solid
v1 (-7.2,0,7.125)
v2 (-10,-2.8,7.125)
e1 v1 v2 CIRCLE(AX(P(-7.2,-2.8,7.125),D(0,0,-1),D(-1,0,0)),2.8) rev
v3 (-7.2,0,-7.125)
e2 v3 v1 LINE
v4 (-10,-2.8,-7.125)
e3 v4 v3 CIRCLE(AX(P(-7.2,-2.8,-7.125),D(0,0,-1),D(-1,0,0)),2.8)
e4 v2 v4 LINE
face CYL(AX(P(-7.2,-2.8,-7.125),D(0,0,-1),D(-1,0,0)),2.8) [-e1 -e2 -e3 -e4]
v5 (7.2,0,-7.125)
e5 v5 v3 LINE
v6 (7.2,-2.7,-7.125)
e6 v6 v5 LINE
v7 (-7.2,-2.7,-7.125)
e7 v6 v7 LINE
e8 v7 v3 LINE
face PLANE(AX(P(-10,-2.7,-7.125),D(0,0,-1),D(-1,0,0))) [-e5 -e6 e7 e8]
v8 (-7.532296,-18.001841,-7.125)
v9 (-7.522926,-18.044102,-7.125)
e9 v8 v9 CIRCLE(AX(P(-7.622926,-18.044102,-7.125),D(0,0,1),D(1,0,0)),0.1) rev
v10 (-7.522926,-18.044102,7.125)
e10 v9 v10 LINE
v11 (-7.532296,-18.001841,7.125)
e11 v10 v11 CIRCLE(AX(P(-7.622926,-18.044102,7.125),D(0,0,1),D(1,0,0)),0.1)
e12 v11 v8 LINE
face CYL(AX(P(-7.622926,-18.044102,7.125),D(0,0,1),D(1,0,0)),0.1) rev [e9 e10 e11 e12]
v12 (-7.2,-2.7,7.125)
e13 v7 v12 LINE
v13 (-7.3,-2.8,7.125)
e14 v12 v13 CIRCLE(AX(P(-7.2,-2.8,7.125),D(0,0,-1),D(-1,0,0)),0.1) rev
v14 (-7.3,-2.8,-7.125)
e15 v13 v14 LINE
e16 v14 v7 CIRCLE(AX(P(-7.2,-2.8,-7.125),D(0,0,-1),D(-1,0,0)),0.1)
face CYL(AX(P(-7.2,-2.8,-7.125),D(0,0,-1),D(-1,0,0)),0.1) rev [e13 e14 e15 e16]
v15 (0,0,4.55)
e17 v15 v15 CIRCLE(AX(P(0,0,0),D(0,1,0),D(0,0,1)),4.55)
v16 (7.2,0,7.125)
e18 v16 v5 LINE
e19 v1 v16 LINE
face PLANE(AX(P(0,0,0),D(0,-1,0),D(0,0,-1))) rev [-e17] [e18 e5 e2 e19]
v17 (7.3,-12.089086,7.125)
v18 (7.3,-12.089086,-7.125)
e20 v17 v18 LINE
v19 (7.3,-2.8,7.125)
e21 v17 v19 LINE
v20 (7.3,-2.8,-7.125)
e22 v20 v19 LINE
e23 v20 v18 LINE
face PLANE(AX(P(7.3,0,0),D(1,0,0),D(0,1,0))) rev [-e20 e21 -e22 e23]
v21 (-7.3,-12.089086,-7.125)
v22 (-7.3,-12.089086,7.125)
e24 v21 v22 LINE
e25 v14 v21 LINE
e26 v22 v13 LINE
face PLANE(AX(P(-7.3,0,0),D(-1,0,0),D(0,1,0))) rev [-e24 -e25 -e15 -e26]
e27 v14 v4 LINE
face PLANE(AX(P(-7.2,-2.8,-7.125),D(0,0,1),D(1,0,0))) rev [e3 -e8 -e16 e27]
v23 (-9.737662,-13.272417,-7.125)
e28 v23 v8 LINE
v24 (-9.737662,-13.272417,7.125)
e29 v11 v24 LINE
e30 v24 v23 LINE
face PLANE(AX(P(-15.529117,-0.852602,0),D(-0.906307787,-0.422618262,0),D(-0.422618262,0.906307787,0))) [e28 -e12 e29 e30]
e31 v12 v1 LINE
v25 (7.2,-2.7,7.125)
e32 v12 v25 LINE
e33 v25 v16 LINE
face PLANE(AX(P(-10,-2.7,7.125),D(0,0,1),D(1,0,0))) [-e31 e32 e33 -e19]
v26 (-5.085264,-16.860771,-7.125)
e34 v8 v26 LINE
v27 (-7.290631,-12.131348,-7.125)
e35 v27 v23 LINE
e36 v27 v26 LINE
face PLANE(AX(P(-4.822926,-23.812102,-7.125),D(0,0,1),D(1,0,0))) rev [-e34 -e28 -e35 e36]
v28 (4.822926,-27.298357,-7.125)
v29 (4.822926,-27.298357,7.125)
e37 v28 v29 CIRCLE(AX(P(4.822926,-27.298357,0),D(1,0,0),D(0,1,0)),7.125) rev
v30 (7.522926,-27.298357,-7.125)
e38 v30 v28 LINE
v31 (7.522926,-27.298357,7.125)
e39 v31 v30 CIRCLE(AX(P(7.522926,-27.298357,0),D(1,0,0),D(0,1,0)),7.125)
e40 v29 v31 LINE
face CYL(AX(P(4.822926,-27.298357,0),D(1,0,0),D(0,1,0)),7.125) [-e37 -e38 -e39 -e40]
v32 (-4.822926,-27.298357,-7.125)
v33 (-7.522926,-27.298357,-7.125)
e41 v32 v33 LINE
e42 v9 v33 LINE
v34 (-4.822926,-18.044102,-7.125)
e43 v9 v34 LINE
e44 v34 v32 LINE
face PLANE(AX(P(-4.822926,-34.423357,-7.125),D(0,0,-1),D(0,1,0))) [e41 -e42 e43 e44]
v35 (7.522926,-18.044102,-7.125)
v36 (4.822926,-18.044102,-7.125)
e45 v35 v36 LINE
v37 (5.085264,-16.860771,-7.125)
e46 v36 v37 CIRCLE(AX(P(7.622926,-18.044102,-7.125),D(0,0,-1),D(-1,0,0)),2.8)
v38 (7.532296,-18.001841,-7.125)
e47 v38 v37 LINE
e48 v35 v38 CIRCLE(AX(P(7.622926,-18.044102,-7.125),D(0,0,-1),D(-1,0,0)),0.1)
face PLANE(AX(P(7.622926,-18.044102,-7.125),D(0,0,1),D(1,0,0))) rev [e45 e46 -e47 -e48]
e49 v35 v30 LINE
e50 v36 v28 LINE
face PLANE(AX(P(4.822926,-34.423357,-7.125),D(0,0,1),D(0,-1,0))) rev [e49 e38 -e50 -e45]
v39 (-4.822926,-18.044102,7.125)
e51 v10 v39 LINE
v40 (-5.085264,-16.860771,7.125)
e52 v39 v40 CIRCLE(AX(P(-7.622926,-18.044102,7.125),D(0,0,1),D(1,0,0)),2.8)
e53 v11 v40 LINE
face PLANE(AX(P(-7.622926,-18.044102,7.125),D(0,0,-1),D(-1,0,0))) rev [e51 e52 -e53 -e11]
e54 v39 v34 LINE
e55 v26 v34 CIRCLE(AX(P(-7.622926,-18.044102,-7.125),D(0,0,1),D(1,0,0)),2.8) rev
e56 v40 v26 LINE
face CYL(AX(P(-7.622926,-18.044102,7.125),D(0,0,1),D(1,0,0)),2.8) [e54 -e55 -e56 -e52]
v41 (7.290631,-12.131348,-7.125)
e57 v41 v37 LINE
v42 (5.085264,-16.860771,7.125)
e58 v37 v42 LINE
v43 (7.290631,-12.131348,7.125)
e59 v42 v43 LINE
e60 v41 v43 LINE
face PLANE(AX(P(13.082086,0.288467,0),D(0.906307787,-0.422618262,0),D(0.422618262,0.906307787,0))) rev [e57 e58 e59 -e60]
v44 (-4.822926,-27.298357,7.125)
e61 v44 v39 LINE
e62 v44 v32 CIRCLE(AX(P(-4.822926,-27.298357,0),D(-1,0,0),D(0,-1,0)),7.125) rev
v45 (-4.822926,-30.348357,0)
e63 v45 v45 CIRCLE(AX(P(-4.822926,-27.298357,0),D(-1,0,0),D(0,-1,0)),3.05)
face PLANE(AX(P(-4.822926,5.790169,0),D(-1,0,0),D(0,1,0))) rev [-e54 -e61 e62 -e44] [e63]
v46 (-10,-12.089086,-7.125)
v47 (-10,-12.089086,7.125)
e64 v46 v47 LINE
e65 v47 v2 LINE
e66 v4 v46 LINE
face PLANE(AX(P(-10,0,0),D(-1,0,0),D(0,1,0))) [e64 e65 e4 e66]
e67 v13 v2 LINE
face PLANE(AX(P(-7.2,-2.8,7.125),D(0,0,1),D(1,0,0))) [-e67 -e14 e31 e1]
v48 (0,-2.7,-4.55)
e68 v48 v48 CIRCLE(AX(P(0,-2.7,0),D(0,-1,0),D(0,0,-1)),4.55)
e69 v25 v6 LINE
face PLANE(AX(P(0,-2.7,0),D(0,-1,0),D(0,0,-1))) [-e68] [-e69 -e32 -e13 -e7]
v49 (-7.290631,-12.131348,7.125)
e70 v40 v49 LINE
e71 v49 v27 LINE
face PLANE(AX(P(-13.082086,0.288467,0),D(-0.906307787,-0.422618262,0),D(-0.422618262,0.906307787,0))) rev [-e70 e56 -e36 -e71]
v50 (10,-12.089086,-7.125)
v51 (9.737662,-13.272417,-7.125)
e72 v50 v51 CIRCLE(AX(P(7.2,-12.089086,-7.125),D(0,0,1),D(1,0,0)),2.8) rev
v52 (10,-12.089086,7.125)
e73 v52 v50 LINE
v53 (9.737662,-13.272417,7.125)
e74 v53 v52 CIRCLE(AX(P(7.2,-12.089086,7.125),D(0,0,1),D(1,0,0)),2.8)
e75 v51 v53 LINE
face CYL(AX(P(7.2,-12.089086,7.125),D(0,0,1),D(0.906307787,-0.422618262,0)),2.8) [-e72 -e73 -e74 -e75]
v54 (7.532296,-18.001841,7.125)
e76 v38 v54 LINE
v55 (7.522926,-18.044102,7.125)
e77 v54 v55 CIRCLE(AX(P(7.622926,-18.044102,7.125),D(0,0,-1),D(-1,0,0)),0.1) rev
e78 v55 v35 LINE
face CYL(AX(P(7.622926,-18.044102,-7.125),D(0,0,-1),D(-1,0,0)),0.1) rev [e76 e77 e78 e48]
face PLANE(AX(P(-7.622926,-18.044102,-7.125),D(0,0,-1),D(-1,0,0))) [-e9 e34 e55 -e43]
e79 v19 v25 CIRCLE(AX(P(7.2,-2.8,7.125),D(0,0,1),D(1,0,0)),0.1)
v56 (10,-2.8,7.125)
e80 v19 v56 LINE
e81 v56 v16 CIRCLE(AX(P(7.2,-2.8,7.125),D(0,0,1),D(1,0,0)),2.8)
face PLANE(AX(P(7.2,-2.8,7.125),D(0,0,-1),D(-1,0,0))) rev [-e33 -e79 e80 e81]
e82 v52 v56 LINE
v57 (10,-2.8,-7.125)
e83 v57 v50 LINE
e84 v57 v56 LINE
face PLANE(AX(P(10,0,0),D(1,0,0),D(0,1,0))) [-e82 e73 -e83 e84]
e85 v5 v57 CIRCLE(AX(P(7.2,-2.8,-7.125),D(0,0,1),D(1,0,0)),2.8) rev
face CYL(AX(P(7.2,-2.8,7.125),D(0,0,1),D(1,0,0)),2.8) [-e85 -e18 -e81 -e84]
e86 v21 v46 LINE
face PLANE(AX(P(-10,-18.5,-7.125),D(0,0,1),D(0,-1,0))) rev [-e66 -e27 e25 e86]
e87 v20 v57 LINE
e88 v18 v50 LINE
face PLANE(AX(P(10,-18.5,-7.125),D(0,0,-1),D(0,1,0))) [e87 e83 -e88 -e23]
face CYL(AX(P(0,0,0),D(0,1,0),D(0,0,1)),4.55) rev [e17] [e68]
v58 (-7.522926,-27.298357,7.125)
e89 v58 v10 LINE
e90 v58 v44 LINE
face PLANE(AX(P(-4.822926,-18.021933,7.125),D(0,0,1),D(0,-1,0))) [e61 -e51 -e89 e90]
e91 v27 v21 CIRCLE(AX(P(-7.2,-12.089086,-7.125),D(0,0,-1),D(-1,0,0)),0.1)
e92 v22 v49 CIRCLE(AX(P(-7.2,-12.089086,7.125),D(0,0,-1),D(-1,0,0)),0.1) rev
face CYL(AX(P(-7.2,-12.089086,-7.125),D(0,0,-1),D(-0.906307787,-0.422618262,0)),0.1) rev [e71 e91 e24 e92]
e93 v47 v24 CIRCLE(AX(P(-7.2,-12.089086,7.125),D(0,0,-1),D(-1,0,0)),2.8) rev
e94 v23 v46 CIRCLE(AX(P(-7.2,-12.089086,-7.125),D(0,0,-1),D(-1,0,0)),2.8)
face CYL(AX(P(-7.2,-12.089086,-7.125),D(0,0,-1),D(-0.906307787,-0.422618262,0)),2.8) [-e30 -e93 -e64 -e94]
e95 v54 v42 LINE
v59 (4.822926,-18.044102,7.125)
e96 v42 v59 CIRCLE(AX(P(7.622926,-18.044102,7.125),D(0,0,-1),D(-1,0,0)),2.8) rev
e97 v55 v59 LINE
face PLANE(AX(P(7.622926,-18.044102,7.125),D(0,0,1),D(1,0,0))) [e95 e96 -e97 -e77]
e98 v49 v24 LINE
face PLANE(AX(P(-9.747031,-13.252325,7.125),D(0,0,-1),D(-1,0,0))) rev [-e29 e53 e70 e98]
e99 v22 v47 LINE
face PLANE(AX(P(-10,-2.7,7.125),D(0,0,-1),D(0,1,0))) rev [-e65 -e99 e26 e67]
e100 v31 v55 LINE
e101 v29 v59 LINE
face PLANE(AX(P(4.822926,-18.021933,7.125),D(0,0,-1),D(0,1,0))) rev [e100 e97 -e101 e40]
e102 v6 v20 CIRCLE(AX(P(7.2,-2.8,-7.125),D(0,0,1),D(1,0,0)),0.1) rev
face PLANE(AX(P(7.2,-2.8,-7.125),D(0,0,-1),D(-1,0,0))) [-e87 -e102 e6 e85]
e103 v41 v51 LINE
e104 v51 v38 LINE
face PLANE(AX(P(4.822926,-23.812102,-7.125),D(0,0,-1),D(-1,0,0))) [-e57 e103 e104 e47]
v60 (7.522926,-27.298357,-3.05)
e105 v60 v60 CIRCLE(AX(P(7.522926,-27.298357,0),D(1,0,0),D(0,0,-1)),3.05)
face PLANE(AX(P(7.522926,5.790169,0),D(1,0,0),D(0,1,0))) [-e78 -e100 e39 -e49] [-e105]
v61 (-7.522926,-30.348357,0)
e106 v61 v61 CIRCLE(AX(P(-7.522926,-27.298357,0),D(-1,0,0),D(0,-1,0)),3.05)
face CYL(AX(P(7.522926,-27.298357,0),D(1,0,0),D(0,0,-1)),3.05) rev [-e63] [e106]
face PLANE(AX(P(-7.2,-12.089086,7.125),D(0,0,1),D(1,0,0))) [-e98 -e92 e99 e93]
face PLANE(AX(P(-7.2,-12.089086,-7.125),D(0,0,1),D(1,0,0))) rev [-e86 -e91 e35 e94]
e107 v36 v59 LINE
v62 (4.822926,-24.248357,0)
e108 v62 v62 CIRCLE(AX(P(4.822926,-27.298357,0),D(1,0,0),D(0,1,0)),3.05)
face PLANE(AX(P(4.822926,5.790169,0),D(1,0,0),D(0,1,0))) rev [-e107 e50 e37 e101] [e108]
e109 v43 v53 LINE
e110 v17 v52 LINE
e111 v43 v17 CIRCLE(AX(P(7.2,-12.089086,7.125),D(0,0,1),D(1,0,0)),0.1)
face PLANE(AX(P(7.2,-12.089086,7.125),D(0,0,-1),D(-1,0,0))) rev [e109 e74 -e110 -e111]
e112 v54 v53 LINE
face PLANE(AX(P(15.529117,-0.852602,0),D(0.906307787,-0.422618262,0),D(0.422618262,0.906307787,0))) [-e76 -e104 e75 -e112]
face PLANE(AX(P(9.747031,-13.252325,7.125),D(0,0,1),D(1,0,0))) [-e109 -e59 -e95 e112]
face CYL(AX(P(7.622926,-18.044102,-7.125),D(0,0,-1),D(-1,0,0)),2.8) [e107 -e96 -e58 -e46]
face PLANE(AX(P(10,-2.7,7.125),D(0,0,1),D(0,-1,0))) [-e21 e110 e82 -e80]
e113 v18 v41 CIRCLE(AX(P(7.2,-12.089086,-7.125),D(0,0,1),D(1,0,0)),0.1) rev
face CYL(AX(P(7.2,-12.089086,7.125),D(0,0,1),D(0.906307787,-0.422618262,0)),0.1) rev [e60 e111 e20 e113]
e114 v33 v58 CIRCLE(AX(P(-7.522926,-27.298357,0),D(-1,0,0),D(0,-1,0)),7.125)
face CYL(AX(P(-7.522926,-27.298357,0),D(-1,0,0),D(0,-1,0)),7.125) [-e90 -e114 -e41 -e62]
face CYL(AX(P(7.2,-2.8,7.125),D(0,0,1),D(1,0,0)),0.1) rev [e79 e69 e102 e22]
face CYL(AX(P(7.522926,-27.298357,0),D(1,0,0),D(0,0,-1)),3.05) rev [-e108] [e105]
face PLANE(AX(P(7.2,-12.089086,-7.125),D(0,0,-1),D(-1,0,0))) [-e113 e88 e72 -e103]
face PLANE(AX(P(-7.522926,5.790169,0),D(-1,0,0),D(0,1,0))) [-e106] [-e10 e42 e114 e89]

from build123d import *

# Parameters (mm, degrees)
ESBO_O1_W                      = 20
ESBO_O1_H                      = 14.25
FLANGE_BASE2_DEPTH             = 2.7
ARESTA_FLANGE1_STRIP_W         = 11
ARESTA_FLANGE1_STRIP_H         = 2.7
ARESTA_FLANGE1_STRIP_CUT_DEPTH = 14.25
ARESTA_FLANGE1_DEPTH           = 14.25
ARESTA_FLANGE4_START           = -7.125
ARESTA_FLANGE4_DEPTH           = 14.25
ARESTA_FLANGE4_2_DEPTH         = 14.25
ARESTA_FLANGE5_START           = -7.125
ARESTA_FLANGE5_DEPTH           = 14.25
ARESTA_FLANGE5_2_DEPTH         = 14.25
FILETE1_RADIUS                 = 7.125
FILETE1_LENGTH                 = 2.7
FILETE1_OF_ESPELHAR1_2_RADIUS  = 7.125
FILETE1_OF_ESPELHAR1_2_LENGTH  = 2.7
FURO_DE_DI_METRO_6_1_6_1_1_D   = 6.1
FURO_DE_DI_METRO_9_1_9_1_2_D   = 9.1


# Read off the part's stored shape, not the designer's step: Aresta-Flange4, Aresta-Flange5
# Sheet-metal steps are written as plain solids
with BuildPart() as part:
    # Esboço1 → Flange-base2 (new body)
    with BuildSketch(Plane(origin=(0, 0, 0), x_dir=(1, 0, 0), z_dir=(0, 1, 0))):
        Rectangle(ESBO_O1_W, ESBO_O1_H)
    extrude(amount=-FLANGE_BASE2_DEPTH)

    # Aresta-Flange1 strip (across the edge) → Aresta-Flange1 strip cut (cut)
    with BuildSketch(Plane(origin=(10, -2.7, -7.125), x_dir=(-1, 0, 0), z_dir=(0, 0, 1))):
        with Locations((-2.7, -1.35)):
            Rectangle(ARESTA_FLANGE1_STRIP_W, ARESTA_FLANGE1_STRIP_H)
    aresta_flange1_strip_cut = extrude(amount=ARESTA_FLANGE1_STRIP_CUT_DEPTH, mode=Mode.SUBTRACT)

    # Aresta-Flange1 section (across the edge) → Aresta-Flange1 (add)
    with BuildSketch(Plane(origin=(10, -2.7, -7.125), x_dir=(-1, 0, 0), z_dir=(0, 0, 1))):
        with BuildLine():
            Line((0, 0.1), (0, 15.8))
            Line((0, 15.8), (2.7, 15.8))
            Line((2.7, 15.8), (2.7, 0.1))
            ThreePointArc((2.7, 0.1), (2.729289322, 0.029289322), (2.8, 0))
            Line((2.8, 0), (2.8, -2.7))
            ThreePointArc((2.8, -2.7), (0.820101013, -1.879898987), (0, 0.1))
        make_face()
    aresta_flange1 = extrude(amount=ARESTA_FLANGE1_DEPTH)

    # Aresta-Flange4 outline → Aresta-Flange4 (cut)
    with BuildSketch(Plane.XY.offset(ARESTA_FLANGE4_START)):
        with BuildLine():
            ThreePointArc((10, -12.089086259), (9.93362882, -12.695117178), (9.737661804, -13.272417392))
            Line((9.737661804, -13.272417392), (7.3, -18.5))
            Line((7.3, -18.5), (10, -18.5))
            Line((10, -18.5), (10, -12.089086259))
        make_face()
    aresta_flange4 = extrude(amount=ARESTA_FLANGE4_DEPTH, mode=Mode.SUBTRACT)

    # Aresta-Flange4 2 outline → Aresta-Flange4 2 (add)
    with BuildSketch(Plane.XY.offset(ARESTA_FLANGE4_START)):
        with BuildLine():
            Line((4.822926294, -23.812101706), (7.3, -18.5))
            Line((7.3, -18.5), (7.3, -12.089086259))
            ThreePointArc((7.3, -12.089086259), (7.297629601, -12.11073022), (7.290630779, -12.131348085))
            Line((7.290630779, -12.131348085), (2.375895269, -22.671032399))
            Line((2.375895269, -22.671032399), (4.822926294, -23.812101706))
        make_face()
    aresta_flange4_2 = extrude(amount=ARESTA_FLANGE4_2_DEPTH)

    # Aresta-Flange5 outline → Aresta-Flange5 (cut)
    with BuildSketch(Plane.XY.offset(ARESTA_FLANGE5_START)):
        with BuildLine():
            Line((4.822926294, -23.812101706), (4.822926294, -18.044102487))
            ThreePointArc((4.822926294, -18.044102487), (4.889297474, -17.438071568), (5.08526449, -16.860771354))
            Line((5.08526449, -16.860771354), (2.375895269, -22.671032399))
            Line((2.375895269, -22.671032399), (4.822926294, -23.812101706))
        make_face()
    aresta_flange5 = extrude(amount=ARESTA_FLANGE5_DEPTH, mode=Mode.SUBTRACT)

    # Aresta-Flange5 2 outline → Aresta-Flange5 2 (add)
    with BuildSketch(Plane.XY.offset(ARESTA_FLANGE5_START)):
        with BuildLine():
            Line((7.532295515, -18.001840661), (4.822926294, -23.812101706))
            Line((4.822926294, -23.812101706), (4.822926294, -34.423357431))
            Line((4.822926294, -34.423357431), (7.522926294, -34.423357431))
            Line((7.522926294, -34.423357431), (7.522926294, -18.044102487))
            ThreePointArc((7.522926294, -18.044102487), (7.525296693, -18.022458526), (7.532295515, -18.001840661))
        make_face()
    aresta_flange5_2 = extrude(amount=ARESTA_FLANGE5_2_DEPTH)

    # Filete1: full round fillet: the end face becomes a half cylinder, R = half its width
    filete1_face = Plane((6.172926294, -34.423357431, 0), x_dir=(-1, 0, 0), z_dir=(0, -1, 0))  # on the end face: x along it, z out of the body
    filete1_slab = filete1_face.offset(-FILETE1_RADIUS / 2) * Box(FILETE1_LENGTH, 2 * FILETE1_RADIUS, FILETE1_RADIUS, mode=Mode.PRIVATE)  # the body's end, R deep
    filete1_round = Plane((6.172926294, -27.298357431, 0), x_dir=(0, -1, 0), z_dir=(-1, 0, 0)) * Cylinder(FILETE1_RADIUS, FILETE1_LENGTH, mode=Mode.PRIVATE)  # its axis R under the face
    add(filete1_slab - filete1_round, mode=Mode.SUBTRACT)

    # Espelhar1: Aresta-Flange1 strip cut, Aresta-Flange1, Aresta-Flange4, Aresta-Flange4 2, Aresta-Flange5, Aresta-Flange5 2 across plane
    add(aresta_flange1_strip_cut.mirror(Plane(origin=(0, 0, 0), x_dir=(0, 0, 1), z_dir=(1, 0, 0))), mode=Mode.SUBTRACT)
    add(aresta_flange1.mirror(Plane(origin=(0, 0, 0), x_dir=(0, 0, 1), z_dir=(1, 0, 0))))
    add(aresta_flange4.mirror(Plane(origin=(0, 0, 0), x_dir=(0, 0, 1), z_dir=(1, 0, 0))), mode=Mode.SUBTRACT)
    add(aresta_flange4_2.mirror(Plane(origin=(0, 0, 0), x_dir=(0, 0, 1), z_dir=(1, 0, 0))))
    add(aresta_flange5.mirror(Plane(origin=(0, 0, 0), x_dir=(0, 0, 1), z_dir=(1, 0, 0))), mode=Mode.SUBTRACT)
    add(aresta_flange5_2.mirror(Plane(origin=(0, 0, 0), x_dir=(0, 0, 1), z_dir=(1, 0, 0))))

    # Filete1 of Espelhar1 2: full round fillet: the end face becomes a half cylinder, R = half its width
    filete1_of_espelhar1_2_face = Plane((-6.172926294, -34.423357431, 0), x_dir=(1, 0, 0), z_dir=(0, -1, 0))  # on the end face: x along it, z out of the body
    filete1_of_espelhar1_2_slab = filete1_of_espelhar1_2_face.offset(-FILETE1_OF_ESPELHAR1_2_RADIUS / 2) * Box(FILETE1_OF_ESPELHAR1_2_LENGTH, 2 * FILETE1_OF_ESPELHAR1_2_RADIUS, FILETE1_OF_ESPELHAR1_2_RADIUS, mode=Mode.PRIVATE)  # the body's end, R deep
    filete1_of_espelhar1_2_round = Plane((-6.172926294, -27.298357431, 0), x_dir=(0, -1, 0), z_dir=(1, 0, 0)) * Cylinder(FILETE1_OF_ESPELHAR1_2_RADIUS, FILETE1_OF_ESPELHAR1_2_LENGTH, mode=Mode.PRIVATE)  # its axis R under the face
    add(filete1_of_espelhar1_2_slab - filete1_of_espelhar1_2_round, mode=Mode.SUBTRACT)

    # Furo de diâmetro Ø6.1 (6.1)1 (through all)
    with Locations(Plane(origin=(7.522926294, 0, 0), x_dir=(0, 0, -1), z_dir=(1, 0, 0))):
        with Locations((0, -27.298357431)):
            Hole(FURO_DE_DI_METRO_6_1_6_1_1_D / 2)

    # Furo de diâmetro Ø9.1 (9.1)2 (through all)
    with Locations(Plane(origin=(0, 0, 0), x_dir=(1, 0, 0), z_dir=(0, 1, 0))):
        with Locations((0, 0)):
            Hole(FURO_DE_DI_METRO_9_1_9_1_2_D / 2)


solid = part.part
